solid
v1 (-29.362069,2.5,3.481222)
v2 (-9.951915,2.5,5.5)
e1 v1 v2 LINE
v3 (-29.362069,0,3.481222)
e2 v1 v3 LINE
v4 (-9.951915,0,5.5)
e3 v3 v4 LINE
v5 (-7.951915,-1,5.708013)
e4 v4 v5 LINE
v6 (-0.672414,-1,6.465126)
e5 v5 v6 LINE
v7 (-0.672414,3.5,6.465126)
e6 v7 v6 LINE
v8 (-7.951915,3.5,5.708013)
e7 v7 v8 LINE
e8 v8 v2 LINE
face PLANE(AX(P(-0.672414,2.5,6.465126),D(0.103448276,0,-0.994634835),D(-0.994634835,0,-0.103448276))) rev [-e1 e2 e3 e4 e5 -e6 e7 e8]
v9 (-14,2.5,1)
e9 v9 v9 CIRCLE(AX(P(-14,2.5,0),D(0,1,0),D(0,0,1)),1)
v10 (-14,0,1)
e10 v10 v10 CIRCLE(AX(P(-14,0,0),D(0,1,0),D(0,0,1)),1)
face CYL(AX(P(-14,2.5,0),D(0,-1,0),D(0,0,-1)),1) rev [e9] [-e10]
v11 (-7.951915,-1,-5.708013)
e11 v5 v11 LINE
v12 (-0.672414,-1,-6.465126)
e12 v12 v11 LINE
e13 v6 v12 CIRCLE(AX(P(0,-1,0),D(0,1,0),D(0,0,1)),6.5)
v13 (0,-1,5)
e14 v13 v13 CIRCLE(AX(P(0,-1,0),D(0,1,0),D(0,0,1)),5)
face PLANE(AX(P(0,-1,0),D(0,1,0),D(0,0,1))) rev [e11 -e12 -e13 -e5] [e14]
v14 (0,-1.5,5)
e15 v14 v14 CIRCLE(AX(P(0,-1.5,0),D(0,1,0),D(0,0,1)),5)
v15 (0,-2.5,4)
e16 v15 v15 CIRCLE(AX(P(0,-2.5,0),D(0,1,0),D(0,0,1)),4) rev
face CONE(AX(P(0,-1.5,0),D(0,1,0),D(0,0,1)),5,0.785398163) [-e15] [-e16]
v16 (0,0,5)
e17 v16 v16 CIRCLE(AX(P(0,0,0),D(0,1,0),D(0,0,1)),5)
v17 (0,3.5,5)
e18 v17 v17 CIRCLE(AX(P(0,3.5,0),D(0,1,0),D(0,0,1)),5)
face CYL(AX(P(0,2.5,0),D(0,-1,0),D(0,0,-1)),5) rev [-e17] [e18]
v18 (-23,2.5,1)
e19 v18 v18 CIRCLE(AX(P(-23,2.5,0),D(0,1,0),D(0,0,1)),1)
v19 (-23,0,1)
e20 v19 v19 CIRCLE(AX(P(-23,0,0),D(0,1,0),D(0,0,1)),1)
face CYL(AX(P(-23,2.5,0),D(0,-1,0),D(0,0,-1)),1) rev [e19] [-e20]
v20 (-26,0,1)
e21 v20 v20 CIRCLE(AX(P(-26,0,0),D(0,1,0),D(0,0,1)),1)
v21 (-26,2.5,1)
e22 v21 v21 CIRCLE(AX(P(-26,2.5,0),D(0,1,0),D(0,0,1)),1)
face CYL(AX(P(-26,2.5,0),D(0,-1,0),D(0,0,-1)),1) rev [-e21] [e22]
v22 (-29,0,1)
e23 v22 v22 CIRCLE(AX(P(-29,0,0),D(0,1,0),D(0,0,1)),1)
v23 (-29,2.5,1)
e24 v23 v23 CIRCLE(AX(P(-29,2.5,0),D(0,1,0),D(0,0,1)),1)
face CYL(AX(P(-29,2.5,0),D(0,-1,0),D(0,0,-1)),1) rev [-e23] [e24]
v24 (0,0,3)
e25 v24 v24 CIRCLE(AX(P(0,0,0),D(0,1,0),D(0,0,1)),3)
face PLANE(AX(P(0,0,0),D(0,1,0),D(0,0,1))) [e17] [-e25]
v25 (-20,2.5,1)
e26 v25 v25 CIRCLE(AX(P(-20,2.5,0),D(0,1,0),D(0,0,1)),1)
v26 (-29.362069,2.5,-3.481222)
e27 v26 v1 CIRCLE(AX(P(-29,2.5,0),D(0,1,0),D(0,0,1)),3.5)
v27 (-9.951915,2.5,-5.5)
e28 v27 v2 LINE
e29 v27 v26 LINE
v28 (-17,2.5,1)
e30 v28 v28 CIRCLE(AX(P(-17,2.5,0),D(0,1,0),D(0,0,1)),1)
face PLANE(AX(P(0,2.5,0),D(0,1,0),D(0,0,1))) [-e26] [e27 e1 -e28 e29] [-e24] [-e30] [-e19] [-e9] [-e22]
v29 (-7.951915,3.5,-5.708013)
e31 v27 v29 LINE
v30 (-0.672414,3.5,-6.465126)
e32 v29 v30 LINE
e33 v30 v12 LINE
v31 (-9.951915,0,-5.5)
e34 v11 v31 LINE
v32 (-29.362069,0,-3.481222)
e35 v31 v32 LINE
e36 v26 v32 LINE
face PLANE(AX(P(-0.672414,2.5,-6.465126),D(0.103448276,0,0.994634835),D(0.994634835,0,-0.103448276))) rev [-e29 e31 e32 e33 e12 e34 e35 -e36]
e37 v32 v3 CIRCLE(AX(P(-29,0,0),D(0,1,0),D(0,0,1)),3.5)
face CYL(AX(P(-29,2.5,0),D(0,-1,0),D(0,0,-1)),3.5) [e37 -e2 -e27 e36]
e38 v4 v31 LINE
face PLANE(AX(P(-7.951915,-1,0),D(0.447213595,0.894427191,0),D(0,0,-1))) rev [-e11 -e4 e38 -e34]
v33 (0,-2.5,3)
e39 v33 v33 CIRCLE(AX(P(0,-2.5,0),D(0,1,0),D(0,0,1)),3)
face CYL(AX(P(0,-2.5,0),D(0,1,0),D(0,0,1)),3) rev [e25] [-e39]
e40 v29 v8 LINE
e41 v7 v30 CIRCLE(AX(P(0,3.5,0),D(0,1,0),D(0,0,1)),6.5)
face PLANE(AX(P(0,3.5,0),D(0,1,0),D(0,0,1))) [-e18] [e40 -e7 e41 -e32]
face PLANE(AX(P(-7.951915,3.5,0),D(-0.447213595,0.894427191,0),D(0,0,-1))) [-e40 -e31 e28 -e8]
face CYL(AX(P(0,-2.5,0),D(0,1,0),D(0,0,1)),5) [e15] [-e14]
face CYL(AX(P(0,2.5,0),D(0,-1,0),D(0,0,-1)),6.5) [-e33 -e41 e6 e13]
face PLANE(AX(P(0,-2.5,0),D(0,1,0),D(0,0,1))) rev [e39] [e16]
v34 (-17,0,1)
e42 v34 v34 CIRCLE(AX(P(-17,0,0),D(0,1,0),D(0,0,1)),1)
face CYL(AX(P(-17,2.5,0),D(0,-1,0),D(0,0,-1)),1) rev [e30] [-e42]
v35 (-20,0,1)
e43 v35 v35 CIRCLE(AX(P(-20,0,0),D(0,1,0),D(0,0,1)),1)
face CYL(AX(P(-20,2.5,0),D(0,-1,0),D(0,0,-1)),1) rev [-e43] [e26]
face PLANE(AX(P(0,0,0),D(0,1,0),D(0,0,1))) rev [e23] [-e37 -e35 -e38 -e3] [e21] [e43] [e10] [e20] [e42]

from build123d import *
from OCP.BRepFilletAPI import BRepFilletAPI_MakeChamfer

# Parameters (mm, degrees)
SKETCH_1_R       = 1
SKETCH_1_R_2     = 5
EXTRUDE_1_DEPTH  = 2.5
EXTRUDE_START    = 2.5
SKETCH_1_3_R     = 5
EXTRUDE_2_DEPTH  = 1
EXTRUDE_START_2  = -1
SKETCH_1_4_R     = 5
EXTRUDE_3_DEPTH  = 1
EXTRUDE_START_3  = -2.5
SKETCH_1_5_R     = 5
SKETCH_1_5_R_2   = 3.5
SKETCH_1_5_R_3   = 3
EXTRUDE_4_DEPTH  = 2.5
CHAMFER_1_SIZE   = 2
CHAMFER_1_SIZE_2 = 1
CHAMFER_2_SIZE   = 1


with BuildPart() as part:
    # Эскиз1 → Бобышка-Вытянуть1 (new body)
    # profile 1 of 2: a face of its own
    with BuildSketch(Plane(origin=(0, 0, 0), x_dir=(1, 0, 0), z_dir=(0, 1, 0))):
        with BuildLine():
            ThreePointArc((-29.362068966, 3.481221921), (-32.5, 0), (-29.362068966, -3.481221921))
            Line((-29.362068966, -3.481221921), (-9.951914627, -5.5))
            Line((-9.951914627, -5.5), (-9.951914627, 5.5))
            Line((-9.951914627, 5.5), (-29.362068966, 3.481221921))
        make_face()
        with Locations(Location((-29, 0, 0), (0, 0, 270))):
            Circle(SKETCH_1_R, mode=Mode.SUBTRACT)
        with Locations(Location((-26, 0, 0), (0, 0, 270))):
            Circle(SKETCH_1_R, mode=Mode.SUBTRACT)
        with Locations(Location((-23, 0, 0), (0, 0, 270))):
            Circle(SKETCH_1_R, mode=Mode.SUBTRACT)
        with Locations(Location((-20, 0, 0), (0, 0, 270))):
            Circle(SKETCH_1_R, mode=Mode.SUBTRACT)
        with Locations(Location((-17, 0, 0), (0, 0, 270))):
            Circle(SKETCH_1_R, mode=Mode.SUBTRACT)
        with Locations(Location((-14, 0, 0), (0, 0, 270))):
            Circle(SKETCH_1_R, mode=Mode.SUBTRACT)
    # profile 2 of 2: a face of its own
    with BuildSketch(Plane(origin=(0, 0, 0), x_dir=(1, 0, 0), z_dir=(0, 1, 0))):
        with BuildLine():
            Line((-9.951914627, 5.5), (-9.951914627, -5.5))
            Line((-9.951914627, -5.5), (-0.672413793, -6.465126425))
            ThreePointArc((-0.672413793, -6.465126425), (6.5, 0), (-0.672413793, 6.465126425))
            Line((-0.672413793, 6.465126425), (-9.951914627, 5.5))
        make_face()
        with Locations(Location((0, 0, 0), (0, 0, 270))):
            Circle(SKETCH_1_R_2, mode=Mode.SUBTRACT)
    extrude(amount=EXTRUDE_1_DEPTH)

    # Эскиз1<3> → Бобышка-Вытянуть2 (add)
    with BuildSketch(Plane(origin=(0, 0, 0), x_dir=(1, 0, 0), z_dir=(0, 1, 0)).offset(EXTRUDE_START)):
        with BuildLine():
            Line((-9.951914627, 5.5), (-9.951914627, -5.5))
            Line((-9.951914627, -5.5), (-0.672413793, -6.465126425))
            ThreePointArc((-0.672413793, -6.465126425), (6.5, 0), (-0.672413793, 6.465126425))
            Line((-0.672413793, 6.465126425), (-9.951914627, 5.5))
        make_face()
        with Locations(Location((0, 0, 0), (0, 0, 270))):
            Circle(SKETCH_1_3_R, mode=Mode.SUBTRACT)
    extrude(amount=EXTRUDE_2_DEPTH)

    # Эскиз1<4> → Бобышка-Вытянуть3 (add)
    with BuildSketch(Plane(origin=(0, 0, 0), x_dir=(1, 0, 0), z_dir=(0, 1, 0)).offset(EXTRUDE_START_2)):
        with BuildLine():
            Line((-9.951914627, 5.5), (-9.951914627, -5.5))
            Line((-9.951914627, -5.5), (-0.672413793, -6.465126425))
            ThreePointArc((-0.672413793, -6.465126425), (6.5, 0), (-0.672413793, 6.465126425))
            Line((-0.672413793, 6.465126425), (-9.951914627, 5.5))
        make_face()
        with Locations(Location((0, 0, 0), (0, 0, 270))):
            Circle(SKETCH_1_4_R, mode=Mode.SUBTRACT)
    extrude(amount=EXTRUDE_3_DEPTH)

    # Эскиз1<5> → Бобышка-Вытянуть4 (add)
    # profile 1 of 2: a face of its own
    with BuildSketch(Plane(origin=(0, 0, 0), x_dir=(1, 0, 0), z_dir=(0, 1, 0)).offset(EXTRUDE_START_3)):
        with Locations(Location((0, 0, 0), (0, 0, 270))):
            Circle(SKETCH_1_5_R)
        Circle(SKETCH_1_5_R_2, mode=Mode.SUBTRACT)
    # profile 2 of 2: a face of its own
    with BuildSketch(Plane(origin=(0, 0, 0), x_dir=(1, 0, 0), z_dir=(0, 1, 0)).offset(EXTRUDE_START_3)):
        Circle(SKETCH_1_5_R_2)
        with Locations(Location((0, 0, 0), (0, 0, 270))):
            Circle(SKETCH_1_5_R_3, mode=Mode.SUBTRACT)
    extrude(amount=EXTRUDE_4_DEPTH)

    # Фаска1
    chamfer_1_edges_1 = [part.edges().sort_by_distance(p)[0] for p in [
        (-9.951914627, 3.5, 0),
    ]]
    chamfer_1_side_1 = [part.faces().sort_by_distance(p)[0] for p in [
        (-9.931914627, 3.5, 0),
    ]]
    chamfer_1_edges_2 = [part.edges().sort_by_distance(p)[0] for p in [
        (-9.951914627, -1, 0),
    ]]
    chamfer_1_side_2 = [part.faces().sort_by_distance(p)[0] for p in [
        (-9.951914627, -0.98, 0),
    ]]
    chamfer_1 = BRepFilletAPI_MakeChamfer(part.part.solid().wrapped)
    for e in chamfer_1_edges_1:
        chamfer_1.Add(CHAMFER_1_SIZE - 0.0001, CHAMFER_1_SIZE_2 - 0.0001, e.wrapped, chamfer_1_side_1[0].wrapped)
    for e in chamfer_1_edges_2:
        chamfer_1.Add(CHAMFER_1_SIZE_2 - 0.0001, CHAMFER_1_SIZE - 0.0001, e.wrapped, chamfer_1_side_2[0].wrapped)
    add(Compound.cast(chamfer_1.Shape()), mode=Mode.REPLACE)  # a hair under: the kernel refuses the full size

    # Фаска2
    chamfer_2_edges = [part.edges().sort_by_distance(p)[0] for p in [
        (0, -2.5, -5),
    ]]
    chamfer(chamfer_2_edges, length=CHAMFER_2_SIZE)


solid = part.part
